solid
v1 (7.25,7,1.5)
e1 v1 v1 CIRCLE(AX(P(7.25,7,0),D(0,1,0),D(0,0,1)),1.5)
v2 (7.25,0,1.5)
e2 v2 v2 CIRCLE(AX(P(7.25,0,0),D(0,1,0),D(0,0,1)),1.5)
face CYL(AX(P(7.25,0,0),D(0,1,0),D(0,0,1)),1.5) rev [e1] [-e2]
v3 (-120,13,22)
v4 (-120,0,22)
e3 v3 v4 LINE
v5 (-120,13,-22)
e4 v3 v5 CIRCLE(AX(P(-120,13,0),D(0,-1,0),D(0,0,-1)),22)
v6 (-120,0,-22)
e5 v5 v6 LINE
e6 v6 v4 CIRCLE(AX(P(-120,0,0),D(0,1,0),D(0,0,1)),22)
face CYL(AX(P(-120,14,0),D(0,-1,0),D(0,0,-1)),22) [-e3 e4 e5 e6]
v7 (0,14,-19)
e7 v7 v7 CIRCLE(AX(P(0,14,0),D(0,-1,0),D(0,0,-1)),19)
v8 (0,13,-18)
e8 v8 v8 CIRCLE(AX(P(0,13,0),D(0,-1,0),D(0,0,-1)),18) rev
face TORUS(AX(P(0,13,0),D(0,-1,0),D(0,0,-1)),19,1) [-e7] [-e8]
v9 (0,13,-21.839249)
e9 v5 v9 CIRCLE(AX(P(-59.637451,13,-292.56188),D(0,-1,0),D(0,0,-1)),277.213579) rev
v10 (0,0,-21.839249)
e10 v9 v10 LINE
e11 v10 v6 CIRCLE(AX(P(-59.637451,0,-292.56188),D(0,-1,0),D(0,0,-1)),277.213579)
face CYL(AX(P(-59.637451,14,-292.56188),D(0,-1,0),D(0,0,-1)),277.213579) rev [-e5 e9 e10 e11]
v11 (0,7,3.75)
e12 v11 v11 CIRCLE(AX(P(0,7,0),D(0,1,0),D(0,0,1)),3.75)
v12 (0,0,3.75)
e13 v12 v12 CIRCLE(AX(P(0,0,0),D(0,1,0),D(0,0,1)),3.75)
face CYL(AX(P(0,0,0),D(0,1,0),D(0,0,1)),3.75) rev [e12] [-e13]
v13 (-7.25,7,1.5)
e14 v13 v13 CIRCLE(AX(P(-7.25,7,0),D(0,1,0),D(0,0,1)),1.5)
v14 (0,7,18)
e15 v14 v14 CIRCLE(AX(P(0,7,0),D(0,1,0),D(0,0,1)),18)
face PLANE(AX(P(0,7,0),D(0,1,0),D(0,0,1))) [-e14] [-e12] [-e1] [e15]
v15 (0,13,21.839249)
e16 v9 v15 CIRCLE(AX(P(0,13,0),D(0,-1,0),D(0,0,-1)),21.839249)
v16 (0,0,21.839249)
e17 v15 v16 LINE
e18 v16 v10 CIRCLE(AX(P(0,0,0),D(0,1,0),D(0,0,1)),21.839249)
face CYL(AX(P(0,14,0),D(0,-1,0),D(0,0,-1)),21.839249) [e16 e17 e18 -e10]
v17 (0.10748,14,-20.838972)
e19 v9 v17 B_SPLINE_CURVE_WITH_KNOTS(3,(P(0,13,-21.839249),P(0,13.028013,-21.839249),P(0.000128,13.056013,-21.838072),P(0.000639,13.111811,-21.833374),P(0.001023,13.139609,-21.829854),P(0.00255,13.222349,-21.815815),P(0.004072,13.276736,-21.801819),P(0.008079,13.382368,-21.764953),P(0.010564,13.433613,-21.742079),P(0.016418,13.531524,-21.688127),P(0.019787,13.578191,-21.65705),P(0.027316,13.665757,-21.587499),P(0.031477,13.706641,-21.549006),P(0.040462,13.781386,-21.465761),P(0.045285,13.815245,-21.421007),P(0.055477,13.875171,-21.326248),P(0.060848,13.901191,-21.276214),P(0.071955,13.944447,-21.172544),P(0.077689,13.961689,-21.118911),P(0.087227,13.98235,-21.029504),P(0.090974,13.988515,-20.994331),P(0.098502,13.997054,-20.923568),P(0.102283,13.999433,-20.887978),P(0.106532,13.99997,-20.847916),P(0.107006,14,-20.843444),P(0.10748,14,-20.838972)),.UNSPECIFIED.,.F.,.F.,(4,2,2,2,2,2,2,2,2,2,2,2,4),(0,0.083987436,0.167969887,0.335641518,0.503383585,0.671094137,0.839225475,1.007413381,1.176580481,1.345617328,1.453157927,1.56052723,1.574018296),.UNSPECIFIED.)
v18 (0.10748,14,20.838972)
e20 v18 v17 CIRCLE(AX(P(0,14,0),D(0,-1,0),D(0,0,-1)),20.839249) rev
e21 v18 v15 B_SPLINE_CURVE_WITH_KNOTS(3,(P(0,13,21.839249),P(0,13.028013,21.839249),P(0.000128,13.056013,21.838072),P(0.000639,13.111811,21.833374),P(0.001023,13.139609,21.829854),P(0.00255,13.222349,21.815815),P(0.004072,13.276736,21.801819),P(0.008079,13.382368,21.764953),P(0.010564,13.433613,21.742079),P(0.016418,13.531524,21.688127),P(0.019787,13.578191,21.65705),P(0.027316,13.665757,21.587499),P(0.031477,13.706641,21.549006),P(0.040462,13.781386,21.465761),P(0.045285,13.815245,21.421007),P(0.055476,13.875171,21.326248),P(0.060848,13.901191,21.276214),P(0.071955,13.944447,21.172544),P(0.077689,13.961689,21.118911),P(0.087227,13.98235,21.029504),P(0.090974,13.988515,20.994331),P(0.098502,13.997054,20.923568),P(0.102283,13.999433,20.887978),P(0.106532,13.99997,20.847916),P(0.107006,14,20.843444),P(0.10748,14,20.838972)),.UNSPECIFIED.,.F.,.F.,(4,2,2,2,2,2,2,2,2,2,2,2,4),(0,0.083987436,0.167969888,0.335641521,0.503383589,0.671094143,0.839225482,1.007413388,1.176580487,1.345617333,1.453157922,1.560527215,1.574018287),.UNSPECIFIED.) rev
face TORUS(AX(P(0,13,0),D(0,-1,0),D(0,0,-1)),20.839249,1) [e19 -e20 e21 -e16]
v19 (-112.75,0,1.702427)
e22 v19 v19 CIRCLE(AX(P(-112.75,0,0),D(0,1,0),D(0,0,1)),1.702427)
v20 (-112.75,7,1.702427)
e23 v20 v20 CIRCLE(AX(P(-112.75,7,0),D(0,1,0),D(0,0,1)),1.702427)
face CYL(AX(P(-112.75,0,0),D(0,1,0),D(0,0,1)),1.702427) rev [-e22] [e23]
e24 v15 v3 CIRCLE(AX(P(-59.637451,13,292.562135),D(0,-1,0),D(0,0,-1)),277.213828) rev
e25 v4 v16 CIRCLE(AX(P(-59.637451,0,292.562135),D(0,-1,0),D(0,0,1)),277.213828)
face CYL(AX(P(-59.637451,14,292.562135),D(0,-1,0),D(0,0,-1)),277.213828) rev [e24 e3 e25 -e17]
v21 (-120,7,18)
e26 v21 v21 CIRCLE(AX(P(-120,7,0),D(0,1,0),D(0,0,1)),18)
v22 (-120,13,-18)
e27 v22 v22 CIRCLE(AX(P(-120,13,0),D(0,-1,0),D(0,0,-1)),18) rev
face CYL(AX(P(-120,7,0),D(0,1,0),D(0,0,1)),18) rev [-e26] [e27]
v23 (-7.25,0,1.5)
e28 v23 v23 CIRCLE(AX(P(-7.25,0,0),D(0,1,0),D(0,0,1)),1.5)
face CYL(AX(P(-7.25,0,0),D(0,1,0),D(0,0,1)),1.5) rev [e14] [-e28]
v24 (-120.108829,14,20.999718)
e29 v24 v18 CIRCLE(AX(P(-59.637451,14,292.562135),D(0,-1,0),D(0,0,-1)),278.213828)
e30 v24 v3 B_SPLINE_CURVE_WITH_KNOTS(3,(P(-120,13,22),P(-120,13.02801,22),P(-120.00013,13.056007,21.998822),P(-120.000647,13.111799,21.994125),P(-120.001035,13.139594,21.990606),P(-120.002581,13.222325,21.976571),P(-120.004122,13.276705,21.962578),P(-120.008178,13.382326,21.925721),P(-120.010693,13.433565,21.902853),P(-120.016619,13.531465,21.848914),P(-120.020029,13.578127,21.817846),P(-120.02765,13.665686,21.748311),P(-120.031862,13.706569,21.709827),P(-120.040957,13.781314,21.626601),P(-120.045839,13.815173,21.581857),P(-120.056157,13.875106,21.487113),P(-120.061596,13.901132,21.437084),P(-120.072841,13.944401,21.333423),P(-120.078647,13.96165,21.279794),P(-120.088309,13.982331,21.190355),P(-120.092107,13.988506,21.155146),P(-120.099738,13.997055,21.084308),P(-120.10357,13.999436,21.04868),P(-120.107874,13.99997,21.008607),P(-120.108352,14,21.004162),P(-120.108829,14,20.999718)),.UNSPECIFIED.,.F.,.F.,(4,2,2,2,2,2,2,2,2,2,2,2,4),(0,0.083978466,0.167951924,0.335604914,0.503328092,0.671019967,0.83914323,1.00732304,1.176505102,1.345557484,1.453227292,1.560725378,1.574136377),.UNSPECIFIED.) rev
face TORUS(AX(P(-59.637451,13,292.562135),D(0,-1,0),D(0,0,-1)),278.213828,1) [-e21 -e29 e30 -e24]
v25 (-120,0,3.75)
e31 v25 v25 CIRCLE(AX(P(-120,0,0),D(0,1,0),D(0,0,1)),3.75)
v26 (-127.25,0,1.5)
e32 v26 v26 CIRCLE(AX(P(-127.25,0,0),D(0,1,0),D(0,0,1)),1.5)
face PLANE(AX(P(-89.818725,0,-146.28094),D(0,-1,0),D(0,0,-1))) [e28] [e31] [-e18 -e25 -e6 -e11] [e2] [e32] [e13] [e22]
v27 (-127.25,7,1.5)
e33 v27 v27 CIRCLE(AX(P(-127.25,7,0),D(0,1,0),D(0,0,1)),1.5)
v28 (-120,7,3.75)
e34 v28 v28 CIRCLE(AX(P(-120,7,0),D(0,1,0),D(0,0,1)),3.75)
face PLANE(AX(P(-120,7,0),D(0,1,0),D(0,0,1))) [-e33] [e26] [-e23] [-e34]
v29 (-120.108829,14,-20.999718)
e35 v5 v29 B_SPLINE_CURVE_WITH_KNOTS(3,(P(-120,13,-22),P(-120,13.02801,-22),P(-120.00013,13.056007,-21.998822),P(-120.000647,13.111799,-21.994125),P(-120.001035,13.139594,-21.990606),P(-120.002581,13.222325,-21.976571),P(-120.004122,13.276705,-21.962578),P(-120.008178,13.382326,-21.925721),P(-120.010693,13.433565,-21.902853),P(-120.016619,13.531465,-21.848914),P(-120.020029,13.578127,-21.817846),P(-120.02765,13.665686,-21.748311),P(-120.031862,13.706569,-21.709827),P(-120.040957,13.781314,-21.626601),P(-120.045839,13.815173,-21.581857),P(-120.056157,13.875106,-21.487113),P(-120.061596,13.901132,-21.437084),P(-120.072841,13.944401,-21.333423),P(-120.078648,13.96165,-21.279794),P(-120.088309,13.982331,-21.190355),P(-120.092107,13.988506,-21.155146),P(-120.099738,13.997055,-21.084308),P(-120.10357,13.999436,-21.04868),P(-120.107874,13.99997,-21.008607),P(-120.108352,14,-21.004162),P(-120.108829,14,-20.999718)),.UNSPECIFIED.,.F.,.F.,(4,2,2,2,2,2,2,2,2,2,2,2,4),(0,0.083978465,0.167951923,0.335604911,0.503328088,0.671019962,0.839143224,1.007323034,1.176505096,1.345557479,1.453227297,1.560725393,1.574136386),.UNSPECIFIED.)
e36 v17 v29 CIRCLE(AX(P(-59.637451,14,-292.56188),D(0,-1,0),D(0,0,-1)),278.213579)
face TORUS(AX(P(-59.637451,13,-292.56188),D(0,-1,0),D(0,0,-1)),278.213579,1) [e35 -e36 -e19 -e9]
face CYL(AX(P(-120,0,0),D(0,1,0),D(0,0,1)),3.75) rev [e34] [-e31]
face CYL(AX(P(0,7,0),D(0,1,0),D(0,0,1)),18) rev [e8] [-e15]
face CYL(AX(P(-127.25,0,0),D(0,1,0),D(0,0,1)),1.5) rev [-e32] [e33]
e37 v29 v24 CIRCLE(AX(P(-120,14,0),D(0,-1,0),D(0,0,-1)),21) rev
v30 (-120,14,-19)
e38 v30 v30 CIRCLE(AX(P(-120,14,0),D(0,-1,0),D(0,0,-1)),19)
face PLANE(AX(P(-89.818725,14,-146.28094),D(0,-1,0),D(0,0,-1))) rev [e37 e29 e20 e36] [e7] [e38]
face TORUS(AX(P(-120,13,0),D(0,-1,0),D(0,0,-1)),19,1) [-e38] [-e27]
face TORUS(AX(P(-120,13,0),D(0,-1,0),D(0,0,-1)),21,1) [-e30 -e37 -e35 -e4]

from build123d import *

# Parameters (mm, degrees)
SALIENTE_EXTRUIR7_DEPTH = 14
CROQUIS4_R              = 18
CORTAR_EXTRUIR1_DEPTH   = 7
CROQUIS5_R              = 3.75
CROQUIS5_R_2            = 1.5
CROQUIS5_R_3            = 1.702426791
CORTAR_EXTRUIR3_DEPTH   = 144.864519601
CROQUIS6_R              = 3.75
CROQUIS6_R_2            = 1.5
CORTAR_EXTRUIR4_DEPTH   = 144.864519601
REDONDEO2_R             = 1


with BuildPart() as part:
    # Croquis1 → Saliente-Extruir7 (new body)
    with BuildSketch(Plane(origin=(0, 0, 0), x_dir=(1, 0, 0), z_dir=(0, 1, 0))):
        with BuildLine():
            ThreePointArc((-120, 22), (-142, 0), (-120, -22))
            ThreePointArc((-120, -22), (-60.008802525, -15.348556021), (0, -21.839249444))
            ThreePointArc((0, -21.839249444), (21.839249444, 0), (0, 21.839249444))
            ThreePointArc((0, 21.839249444), (-60.008802533, 15.348549982), (-120, 22))
        make_face()
    extrude(amount=SALIENTE_EXTRUIR7_DEPTH)

    # Croquis4 → Cortar-Extruir1 (cut)
    with BuildSketch(Plane(origin=(0, 14, 0), x_dir=(1, 0, 0), z_dir=(0, 1, 0))):
        with Locations(Location((-120, 0, 0), (0, 0, 270))):
            Circle(CROQUIS4_R)
        with Locations(Location((0, 0, 0), (0, 0, 270))):
            Circle(CROQUIS4_R)
    extrude(amount=-CORTAR_EXTRUIR1_DEPTH, mode=Mode.SUBTRACT)

    # Croquis5 → Cortar-Extruir3 (cut, through all)
    with BuildSketch(Plane(origin=(0, 7, 0), x_dir=(1, 0, 0), z_dir=(0, 1, 0))):
        with Locations(Location((-120, 0, 0), (0, 0, 270))):
            Circle(CROQUIS5_R)
        with Locations(Location((-127.25, 0, 0), (0, 0, 270))):
            Circle(CROQUIS5_R_2)
        with Locations(Location((-112.75, 0, 0), (0, 0, 270))):
            Circle(CROQUIS5_R_3)
    extrude(amount=-CORTAR_EXTRUIR3_DEPTH, mode=Mode.SUBTRACT)

    # Croquis6 → Cortar-Extruir4 (cut, through all)
    with BuildSketch(Plane(origin=(0, 7, 0), x_dir=(1, 0, 0), z_dir=(0, 1, 0))):
        with Locations(Location((0, 0, 0), (0, 0, 270))):
            Circle(CROQUIS6_R)
        with Locations(Location((7.25, 0, 0), (0, 0, 270))):
            Circle(CROQUIS6_R_2)
        with Locations(Location((-7.25, 0, 0), (0, 0, 270))):
            Circle(CROQUIS6_R_2)
    extrude(amount=-CORTAR_EXTRUIR4_DEPTH, mode=Mode.SUBTRACT)

    # Redondeo2
    # the kernel refuses this fillet: 1 mm, written as the material it takes off along each edge
    with BuildSketch(Plane(origin=(-59.637450549, 14, 292.562134942), x_dir=(-0.226540467768197, 0, -0.9740017538297179), z_dir=(-0.9740017538297179, 0, 0.226540467768197))) as redondeo2_piece_1:
        with BuildLine():
            CenterArc((277.21382765 + REDONDEO2_R, REDONDEO2_R), REDONDEO2_R, 180, 90)
            Line((277.21382765 + REDONDEO2_R, 0), (277.21382765, 0))
            Line((277.21382765, 0), (277.21382765, REDONDEO2_R))
        make_face()
    revolve(axis=Axis((-59.637450549, 14, 292.562134942), (0, -1, 0)), revolution_arc=26.03345413, mode=Mode.SUBTRACT)
    with BuildSketch(Plane(origin=(-120, 14, 0), x_dir=(0, 0, 1), z_dir=(-1, 0, 0))) as redondeo2_piece_2:
        with BuildLine():
            CenterArc((18 + REDONDEO2_R, -REDONDEO2_R), REDONDEO2_R, 90, 90)
            Line((18, -REDONDEO2_R), (18, 0))
            Line((18, 0), (18 + REDONDEO2_R, 0))
        make_face()
    revolve(axis=Axis((-120, 14, 0), (0, 1, 0)), mode=Mode.SUBTRACT)
    with BuildSketch(Plane(origin=(0, 14, 0), x_dir=(-0.11440584030720254, 0, 0.993434096306143), z_dir=(-0.993434096306143, 0, -0.11440584030720254))) as redondeo2_piece_3:
        with BuildLine():
            CenterArc((21.839249444 - REDONDEO2_R, -REDONDEO2_R), REDONDEO2_R, 0, 90)
            Line((21.839249444 - REDONDEO2_R, 0), (21.839249444, 0))
            Line((21.839249444, 0), (21.839249444, -REDONDEO2_R))
        make_face()
    revolve(axis=Axis((0, 14, 0), (0, 1, 0)), revolution_arc=193.138712049, mode=Mode.SUBTRACT)
    with BuildSketch(Plane(origin=(0, 14, 0), x_dir=(0, 0, 1), z_dir=(-1, 0, 0))) as redondeo2_piece_4:
        with BuildLine():
            CenterArc((18 + REDONDEO2_R, -REDONDEO2_R), REDONDEO2_R, 90, 90)
            Line((18, -REDONDEO2_R), (18, 0))
            Line((18, 0), (18 + REDONDEO2_R, 0))
        make_face()
    revolve(axis=Axis((0, 14, 0), (0, 1, 0)), mode=Mode.SUBTRACT)
    with BuildSketch(Plane(origin=(-59.637450891, 14, -292.561880174), x_dir=(0.22393033908793564, 0, 0.9746051524776391), z_dir=(0.9746051524776391, 0, -0.22393033908793564))) as redondeo2_piece_5:
        with BuildLine():
            CenterArc((277.213578921 + REDONDEO2_R, REDONDEO2_R), REDONDEO2_R, 180, 90)
            Line((277.213578921 + REDONDEO2_R, 0), (277.213578921, 0))
            Line((277.213578921, 0), (277.213578921, REDONDEO2_R))
        make_face()
    revolve(axis=Axis((-59.637450891, 14, -292.561880174), (0, -1, 0)), revolution_arc=26.033477851, mode=Mode.SUBTRACT)
    with BuildSketch(Plane(origin=(-120, 14, 0), x_dir=(0.11357352107267756, 0, -0.9935295945824433), z_dir=(0.9935295945824433, 0, 0.11357352107267756))) as redondeo2_piece_6:
        with BuildLine():
            CenterArc((22 - REDONDEO2_R, -REDONDEO2_R), REDONDEO2_R, 0, 90)
            Line((22, -REDONDEO2_R), (22, 0))
            Line((22, 0), (22 - REDONDEO2_R, 0))
        make_face()
    revolve(axis=Axis((-120, 14, 0), (0, 1, 0)), revolution_arc=193.042709536, mode=Mode.SUBTRACT)


solid = part.part
